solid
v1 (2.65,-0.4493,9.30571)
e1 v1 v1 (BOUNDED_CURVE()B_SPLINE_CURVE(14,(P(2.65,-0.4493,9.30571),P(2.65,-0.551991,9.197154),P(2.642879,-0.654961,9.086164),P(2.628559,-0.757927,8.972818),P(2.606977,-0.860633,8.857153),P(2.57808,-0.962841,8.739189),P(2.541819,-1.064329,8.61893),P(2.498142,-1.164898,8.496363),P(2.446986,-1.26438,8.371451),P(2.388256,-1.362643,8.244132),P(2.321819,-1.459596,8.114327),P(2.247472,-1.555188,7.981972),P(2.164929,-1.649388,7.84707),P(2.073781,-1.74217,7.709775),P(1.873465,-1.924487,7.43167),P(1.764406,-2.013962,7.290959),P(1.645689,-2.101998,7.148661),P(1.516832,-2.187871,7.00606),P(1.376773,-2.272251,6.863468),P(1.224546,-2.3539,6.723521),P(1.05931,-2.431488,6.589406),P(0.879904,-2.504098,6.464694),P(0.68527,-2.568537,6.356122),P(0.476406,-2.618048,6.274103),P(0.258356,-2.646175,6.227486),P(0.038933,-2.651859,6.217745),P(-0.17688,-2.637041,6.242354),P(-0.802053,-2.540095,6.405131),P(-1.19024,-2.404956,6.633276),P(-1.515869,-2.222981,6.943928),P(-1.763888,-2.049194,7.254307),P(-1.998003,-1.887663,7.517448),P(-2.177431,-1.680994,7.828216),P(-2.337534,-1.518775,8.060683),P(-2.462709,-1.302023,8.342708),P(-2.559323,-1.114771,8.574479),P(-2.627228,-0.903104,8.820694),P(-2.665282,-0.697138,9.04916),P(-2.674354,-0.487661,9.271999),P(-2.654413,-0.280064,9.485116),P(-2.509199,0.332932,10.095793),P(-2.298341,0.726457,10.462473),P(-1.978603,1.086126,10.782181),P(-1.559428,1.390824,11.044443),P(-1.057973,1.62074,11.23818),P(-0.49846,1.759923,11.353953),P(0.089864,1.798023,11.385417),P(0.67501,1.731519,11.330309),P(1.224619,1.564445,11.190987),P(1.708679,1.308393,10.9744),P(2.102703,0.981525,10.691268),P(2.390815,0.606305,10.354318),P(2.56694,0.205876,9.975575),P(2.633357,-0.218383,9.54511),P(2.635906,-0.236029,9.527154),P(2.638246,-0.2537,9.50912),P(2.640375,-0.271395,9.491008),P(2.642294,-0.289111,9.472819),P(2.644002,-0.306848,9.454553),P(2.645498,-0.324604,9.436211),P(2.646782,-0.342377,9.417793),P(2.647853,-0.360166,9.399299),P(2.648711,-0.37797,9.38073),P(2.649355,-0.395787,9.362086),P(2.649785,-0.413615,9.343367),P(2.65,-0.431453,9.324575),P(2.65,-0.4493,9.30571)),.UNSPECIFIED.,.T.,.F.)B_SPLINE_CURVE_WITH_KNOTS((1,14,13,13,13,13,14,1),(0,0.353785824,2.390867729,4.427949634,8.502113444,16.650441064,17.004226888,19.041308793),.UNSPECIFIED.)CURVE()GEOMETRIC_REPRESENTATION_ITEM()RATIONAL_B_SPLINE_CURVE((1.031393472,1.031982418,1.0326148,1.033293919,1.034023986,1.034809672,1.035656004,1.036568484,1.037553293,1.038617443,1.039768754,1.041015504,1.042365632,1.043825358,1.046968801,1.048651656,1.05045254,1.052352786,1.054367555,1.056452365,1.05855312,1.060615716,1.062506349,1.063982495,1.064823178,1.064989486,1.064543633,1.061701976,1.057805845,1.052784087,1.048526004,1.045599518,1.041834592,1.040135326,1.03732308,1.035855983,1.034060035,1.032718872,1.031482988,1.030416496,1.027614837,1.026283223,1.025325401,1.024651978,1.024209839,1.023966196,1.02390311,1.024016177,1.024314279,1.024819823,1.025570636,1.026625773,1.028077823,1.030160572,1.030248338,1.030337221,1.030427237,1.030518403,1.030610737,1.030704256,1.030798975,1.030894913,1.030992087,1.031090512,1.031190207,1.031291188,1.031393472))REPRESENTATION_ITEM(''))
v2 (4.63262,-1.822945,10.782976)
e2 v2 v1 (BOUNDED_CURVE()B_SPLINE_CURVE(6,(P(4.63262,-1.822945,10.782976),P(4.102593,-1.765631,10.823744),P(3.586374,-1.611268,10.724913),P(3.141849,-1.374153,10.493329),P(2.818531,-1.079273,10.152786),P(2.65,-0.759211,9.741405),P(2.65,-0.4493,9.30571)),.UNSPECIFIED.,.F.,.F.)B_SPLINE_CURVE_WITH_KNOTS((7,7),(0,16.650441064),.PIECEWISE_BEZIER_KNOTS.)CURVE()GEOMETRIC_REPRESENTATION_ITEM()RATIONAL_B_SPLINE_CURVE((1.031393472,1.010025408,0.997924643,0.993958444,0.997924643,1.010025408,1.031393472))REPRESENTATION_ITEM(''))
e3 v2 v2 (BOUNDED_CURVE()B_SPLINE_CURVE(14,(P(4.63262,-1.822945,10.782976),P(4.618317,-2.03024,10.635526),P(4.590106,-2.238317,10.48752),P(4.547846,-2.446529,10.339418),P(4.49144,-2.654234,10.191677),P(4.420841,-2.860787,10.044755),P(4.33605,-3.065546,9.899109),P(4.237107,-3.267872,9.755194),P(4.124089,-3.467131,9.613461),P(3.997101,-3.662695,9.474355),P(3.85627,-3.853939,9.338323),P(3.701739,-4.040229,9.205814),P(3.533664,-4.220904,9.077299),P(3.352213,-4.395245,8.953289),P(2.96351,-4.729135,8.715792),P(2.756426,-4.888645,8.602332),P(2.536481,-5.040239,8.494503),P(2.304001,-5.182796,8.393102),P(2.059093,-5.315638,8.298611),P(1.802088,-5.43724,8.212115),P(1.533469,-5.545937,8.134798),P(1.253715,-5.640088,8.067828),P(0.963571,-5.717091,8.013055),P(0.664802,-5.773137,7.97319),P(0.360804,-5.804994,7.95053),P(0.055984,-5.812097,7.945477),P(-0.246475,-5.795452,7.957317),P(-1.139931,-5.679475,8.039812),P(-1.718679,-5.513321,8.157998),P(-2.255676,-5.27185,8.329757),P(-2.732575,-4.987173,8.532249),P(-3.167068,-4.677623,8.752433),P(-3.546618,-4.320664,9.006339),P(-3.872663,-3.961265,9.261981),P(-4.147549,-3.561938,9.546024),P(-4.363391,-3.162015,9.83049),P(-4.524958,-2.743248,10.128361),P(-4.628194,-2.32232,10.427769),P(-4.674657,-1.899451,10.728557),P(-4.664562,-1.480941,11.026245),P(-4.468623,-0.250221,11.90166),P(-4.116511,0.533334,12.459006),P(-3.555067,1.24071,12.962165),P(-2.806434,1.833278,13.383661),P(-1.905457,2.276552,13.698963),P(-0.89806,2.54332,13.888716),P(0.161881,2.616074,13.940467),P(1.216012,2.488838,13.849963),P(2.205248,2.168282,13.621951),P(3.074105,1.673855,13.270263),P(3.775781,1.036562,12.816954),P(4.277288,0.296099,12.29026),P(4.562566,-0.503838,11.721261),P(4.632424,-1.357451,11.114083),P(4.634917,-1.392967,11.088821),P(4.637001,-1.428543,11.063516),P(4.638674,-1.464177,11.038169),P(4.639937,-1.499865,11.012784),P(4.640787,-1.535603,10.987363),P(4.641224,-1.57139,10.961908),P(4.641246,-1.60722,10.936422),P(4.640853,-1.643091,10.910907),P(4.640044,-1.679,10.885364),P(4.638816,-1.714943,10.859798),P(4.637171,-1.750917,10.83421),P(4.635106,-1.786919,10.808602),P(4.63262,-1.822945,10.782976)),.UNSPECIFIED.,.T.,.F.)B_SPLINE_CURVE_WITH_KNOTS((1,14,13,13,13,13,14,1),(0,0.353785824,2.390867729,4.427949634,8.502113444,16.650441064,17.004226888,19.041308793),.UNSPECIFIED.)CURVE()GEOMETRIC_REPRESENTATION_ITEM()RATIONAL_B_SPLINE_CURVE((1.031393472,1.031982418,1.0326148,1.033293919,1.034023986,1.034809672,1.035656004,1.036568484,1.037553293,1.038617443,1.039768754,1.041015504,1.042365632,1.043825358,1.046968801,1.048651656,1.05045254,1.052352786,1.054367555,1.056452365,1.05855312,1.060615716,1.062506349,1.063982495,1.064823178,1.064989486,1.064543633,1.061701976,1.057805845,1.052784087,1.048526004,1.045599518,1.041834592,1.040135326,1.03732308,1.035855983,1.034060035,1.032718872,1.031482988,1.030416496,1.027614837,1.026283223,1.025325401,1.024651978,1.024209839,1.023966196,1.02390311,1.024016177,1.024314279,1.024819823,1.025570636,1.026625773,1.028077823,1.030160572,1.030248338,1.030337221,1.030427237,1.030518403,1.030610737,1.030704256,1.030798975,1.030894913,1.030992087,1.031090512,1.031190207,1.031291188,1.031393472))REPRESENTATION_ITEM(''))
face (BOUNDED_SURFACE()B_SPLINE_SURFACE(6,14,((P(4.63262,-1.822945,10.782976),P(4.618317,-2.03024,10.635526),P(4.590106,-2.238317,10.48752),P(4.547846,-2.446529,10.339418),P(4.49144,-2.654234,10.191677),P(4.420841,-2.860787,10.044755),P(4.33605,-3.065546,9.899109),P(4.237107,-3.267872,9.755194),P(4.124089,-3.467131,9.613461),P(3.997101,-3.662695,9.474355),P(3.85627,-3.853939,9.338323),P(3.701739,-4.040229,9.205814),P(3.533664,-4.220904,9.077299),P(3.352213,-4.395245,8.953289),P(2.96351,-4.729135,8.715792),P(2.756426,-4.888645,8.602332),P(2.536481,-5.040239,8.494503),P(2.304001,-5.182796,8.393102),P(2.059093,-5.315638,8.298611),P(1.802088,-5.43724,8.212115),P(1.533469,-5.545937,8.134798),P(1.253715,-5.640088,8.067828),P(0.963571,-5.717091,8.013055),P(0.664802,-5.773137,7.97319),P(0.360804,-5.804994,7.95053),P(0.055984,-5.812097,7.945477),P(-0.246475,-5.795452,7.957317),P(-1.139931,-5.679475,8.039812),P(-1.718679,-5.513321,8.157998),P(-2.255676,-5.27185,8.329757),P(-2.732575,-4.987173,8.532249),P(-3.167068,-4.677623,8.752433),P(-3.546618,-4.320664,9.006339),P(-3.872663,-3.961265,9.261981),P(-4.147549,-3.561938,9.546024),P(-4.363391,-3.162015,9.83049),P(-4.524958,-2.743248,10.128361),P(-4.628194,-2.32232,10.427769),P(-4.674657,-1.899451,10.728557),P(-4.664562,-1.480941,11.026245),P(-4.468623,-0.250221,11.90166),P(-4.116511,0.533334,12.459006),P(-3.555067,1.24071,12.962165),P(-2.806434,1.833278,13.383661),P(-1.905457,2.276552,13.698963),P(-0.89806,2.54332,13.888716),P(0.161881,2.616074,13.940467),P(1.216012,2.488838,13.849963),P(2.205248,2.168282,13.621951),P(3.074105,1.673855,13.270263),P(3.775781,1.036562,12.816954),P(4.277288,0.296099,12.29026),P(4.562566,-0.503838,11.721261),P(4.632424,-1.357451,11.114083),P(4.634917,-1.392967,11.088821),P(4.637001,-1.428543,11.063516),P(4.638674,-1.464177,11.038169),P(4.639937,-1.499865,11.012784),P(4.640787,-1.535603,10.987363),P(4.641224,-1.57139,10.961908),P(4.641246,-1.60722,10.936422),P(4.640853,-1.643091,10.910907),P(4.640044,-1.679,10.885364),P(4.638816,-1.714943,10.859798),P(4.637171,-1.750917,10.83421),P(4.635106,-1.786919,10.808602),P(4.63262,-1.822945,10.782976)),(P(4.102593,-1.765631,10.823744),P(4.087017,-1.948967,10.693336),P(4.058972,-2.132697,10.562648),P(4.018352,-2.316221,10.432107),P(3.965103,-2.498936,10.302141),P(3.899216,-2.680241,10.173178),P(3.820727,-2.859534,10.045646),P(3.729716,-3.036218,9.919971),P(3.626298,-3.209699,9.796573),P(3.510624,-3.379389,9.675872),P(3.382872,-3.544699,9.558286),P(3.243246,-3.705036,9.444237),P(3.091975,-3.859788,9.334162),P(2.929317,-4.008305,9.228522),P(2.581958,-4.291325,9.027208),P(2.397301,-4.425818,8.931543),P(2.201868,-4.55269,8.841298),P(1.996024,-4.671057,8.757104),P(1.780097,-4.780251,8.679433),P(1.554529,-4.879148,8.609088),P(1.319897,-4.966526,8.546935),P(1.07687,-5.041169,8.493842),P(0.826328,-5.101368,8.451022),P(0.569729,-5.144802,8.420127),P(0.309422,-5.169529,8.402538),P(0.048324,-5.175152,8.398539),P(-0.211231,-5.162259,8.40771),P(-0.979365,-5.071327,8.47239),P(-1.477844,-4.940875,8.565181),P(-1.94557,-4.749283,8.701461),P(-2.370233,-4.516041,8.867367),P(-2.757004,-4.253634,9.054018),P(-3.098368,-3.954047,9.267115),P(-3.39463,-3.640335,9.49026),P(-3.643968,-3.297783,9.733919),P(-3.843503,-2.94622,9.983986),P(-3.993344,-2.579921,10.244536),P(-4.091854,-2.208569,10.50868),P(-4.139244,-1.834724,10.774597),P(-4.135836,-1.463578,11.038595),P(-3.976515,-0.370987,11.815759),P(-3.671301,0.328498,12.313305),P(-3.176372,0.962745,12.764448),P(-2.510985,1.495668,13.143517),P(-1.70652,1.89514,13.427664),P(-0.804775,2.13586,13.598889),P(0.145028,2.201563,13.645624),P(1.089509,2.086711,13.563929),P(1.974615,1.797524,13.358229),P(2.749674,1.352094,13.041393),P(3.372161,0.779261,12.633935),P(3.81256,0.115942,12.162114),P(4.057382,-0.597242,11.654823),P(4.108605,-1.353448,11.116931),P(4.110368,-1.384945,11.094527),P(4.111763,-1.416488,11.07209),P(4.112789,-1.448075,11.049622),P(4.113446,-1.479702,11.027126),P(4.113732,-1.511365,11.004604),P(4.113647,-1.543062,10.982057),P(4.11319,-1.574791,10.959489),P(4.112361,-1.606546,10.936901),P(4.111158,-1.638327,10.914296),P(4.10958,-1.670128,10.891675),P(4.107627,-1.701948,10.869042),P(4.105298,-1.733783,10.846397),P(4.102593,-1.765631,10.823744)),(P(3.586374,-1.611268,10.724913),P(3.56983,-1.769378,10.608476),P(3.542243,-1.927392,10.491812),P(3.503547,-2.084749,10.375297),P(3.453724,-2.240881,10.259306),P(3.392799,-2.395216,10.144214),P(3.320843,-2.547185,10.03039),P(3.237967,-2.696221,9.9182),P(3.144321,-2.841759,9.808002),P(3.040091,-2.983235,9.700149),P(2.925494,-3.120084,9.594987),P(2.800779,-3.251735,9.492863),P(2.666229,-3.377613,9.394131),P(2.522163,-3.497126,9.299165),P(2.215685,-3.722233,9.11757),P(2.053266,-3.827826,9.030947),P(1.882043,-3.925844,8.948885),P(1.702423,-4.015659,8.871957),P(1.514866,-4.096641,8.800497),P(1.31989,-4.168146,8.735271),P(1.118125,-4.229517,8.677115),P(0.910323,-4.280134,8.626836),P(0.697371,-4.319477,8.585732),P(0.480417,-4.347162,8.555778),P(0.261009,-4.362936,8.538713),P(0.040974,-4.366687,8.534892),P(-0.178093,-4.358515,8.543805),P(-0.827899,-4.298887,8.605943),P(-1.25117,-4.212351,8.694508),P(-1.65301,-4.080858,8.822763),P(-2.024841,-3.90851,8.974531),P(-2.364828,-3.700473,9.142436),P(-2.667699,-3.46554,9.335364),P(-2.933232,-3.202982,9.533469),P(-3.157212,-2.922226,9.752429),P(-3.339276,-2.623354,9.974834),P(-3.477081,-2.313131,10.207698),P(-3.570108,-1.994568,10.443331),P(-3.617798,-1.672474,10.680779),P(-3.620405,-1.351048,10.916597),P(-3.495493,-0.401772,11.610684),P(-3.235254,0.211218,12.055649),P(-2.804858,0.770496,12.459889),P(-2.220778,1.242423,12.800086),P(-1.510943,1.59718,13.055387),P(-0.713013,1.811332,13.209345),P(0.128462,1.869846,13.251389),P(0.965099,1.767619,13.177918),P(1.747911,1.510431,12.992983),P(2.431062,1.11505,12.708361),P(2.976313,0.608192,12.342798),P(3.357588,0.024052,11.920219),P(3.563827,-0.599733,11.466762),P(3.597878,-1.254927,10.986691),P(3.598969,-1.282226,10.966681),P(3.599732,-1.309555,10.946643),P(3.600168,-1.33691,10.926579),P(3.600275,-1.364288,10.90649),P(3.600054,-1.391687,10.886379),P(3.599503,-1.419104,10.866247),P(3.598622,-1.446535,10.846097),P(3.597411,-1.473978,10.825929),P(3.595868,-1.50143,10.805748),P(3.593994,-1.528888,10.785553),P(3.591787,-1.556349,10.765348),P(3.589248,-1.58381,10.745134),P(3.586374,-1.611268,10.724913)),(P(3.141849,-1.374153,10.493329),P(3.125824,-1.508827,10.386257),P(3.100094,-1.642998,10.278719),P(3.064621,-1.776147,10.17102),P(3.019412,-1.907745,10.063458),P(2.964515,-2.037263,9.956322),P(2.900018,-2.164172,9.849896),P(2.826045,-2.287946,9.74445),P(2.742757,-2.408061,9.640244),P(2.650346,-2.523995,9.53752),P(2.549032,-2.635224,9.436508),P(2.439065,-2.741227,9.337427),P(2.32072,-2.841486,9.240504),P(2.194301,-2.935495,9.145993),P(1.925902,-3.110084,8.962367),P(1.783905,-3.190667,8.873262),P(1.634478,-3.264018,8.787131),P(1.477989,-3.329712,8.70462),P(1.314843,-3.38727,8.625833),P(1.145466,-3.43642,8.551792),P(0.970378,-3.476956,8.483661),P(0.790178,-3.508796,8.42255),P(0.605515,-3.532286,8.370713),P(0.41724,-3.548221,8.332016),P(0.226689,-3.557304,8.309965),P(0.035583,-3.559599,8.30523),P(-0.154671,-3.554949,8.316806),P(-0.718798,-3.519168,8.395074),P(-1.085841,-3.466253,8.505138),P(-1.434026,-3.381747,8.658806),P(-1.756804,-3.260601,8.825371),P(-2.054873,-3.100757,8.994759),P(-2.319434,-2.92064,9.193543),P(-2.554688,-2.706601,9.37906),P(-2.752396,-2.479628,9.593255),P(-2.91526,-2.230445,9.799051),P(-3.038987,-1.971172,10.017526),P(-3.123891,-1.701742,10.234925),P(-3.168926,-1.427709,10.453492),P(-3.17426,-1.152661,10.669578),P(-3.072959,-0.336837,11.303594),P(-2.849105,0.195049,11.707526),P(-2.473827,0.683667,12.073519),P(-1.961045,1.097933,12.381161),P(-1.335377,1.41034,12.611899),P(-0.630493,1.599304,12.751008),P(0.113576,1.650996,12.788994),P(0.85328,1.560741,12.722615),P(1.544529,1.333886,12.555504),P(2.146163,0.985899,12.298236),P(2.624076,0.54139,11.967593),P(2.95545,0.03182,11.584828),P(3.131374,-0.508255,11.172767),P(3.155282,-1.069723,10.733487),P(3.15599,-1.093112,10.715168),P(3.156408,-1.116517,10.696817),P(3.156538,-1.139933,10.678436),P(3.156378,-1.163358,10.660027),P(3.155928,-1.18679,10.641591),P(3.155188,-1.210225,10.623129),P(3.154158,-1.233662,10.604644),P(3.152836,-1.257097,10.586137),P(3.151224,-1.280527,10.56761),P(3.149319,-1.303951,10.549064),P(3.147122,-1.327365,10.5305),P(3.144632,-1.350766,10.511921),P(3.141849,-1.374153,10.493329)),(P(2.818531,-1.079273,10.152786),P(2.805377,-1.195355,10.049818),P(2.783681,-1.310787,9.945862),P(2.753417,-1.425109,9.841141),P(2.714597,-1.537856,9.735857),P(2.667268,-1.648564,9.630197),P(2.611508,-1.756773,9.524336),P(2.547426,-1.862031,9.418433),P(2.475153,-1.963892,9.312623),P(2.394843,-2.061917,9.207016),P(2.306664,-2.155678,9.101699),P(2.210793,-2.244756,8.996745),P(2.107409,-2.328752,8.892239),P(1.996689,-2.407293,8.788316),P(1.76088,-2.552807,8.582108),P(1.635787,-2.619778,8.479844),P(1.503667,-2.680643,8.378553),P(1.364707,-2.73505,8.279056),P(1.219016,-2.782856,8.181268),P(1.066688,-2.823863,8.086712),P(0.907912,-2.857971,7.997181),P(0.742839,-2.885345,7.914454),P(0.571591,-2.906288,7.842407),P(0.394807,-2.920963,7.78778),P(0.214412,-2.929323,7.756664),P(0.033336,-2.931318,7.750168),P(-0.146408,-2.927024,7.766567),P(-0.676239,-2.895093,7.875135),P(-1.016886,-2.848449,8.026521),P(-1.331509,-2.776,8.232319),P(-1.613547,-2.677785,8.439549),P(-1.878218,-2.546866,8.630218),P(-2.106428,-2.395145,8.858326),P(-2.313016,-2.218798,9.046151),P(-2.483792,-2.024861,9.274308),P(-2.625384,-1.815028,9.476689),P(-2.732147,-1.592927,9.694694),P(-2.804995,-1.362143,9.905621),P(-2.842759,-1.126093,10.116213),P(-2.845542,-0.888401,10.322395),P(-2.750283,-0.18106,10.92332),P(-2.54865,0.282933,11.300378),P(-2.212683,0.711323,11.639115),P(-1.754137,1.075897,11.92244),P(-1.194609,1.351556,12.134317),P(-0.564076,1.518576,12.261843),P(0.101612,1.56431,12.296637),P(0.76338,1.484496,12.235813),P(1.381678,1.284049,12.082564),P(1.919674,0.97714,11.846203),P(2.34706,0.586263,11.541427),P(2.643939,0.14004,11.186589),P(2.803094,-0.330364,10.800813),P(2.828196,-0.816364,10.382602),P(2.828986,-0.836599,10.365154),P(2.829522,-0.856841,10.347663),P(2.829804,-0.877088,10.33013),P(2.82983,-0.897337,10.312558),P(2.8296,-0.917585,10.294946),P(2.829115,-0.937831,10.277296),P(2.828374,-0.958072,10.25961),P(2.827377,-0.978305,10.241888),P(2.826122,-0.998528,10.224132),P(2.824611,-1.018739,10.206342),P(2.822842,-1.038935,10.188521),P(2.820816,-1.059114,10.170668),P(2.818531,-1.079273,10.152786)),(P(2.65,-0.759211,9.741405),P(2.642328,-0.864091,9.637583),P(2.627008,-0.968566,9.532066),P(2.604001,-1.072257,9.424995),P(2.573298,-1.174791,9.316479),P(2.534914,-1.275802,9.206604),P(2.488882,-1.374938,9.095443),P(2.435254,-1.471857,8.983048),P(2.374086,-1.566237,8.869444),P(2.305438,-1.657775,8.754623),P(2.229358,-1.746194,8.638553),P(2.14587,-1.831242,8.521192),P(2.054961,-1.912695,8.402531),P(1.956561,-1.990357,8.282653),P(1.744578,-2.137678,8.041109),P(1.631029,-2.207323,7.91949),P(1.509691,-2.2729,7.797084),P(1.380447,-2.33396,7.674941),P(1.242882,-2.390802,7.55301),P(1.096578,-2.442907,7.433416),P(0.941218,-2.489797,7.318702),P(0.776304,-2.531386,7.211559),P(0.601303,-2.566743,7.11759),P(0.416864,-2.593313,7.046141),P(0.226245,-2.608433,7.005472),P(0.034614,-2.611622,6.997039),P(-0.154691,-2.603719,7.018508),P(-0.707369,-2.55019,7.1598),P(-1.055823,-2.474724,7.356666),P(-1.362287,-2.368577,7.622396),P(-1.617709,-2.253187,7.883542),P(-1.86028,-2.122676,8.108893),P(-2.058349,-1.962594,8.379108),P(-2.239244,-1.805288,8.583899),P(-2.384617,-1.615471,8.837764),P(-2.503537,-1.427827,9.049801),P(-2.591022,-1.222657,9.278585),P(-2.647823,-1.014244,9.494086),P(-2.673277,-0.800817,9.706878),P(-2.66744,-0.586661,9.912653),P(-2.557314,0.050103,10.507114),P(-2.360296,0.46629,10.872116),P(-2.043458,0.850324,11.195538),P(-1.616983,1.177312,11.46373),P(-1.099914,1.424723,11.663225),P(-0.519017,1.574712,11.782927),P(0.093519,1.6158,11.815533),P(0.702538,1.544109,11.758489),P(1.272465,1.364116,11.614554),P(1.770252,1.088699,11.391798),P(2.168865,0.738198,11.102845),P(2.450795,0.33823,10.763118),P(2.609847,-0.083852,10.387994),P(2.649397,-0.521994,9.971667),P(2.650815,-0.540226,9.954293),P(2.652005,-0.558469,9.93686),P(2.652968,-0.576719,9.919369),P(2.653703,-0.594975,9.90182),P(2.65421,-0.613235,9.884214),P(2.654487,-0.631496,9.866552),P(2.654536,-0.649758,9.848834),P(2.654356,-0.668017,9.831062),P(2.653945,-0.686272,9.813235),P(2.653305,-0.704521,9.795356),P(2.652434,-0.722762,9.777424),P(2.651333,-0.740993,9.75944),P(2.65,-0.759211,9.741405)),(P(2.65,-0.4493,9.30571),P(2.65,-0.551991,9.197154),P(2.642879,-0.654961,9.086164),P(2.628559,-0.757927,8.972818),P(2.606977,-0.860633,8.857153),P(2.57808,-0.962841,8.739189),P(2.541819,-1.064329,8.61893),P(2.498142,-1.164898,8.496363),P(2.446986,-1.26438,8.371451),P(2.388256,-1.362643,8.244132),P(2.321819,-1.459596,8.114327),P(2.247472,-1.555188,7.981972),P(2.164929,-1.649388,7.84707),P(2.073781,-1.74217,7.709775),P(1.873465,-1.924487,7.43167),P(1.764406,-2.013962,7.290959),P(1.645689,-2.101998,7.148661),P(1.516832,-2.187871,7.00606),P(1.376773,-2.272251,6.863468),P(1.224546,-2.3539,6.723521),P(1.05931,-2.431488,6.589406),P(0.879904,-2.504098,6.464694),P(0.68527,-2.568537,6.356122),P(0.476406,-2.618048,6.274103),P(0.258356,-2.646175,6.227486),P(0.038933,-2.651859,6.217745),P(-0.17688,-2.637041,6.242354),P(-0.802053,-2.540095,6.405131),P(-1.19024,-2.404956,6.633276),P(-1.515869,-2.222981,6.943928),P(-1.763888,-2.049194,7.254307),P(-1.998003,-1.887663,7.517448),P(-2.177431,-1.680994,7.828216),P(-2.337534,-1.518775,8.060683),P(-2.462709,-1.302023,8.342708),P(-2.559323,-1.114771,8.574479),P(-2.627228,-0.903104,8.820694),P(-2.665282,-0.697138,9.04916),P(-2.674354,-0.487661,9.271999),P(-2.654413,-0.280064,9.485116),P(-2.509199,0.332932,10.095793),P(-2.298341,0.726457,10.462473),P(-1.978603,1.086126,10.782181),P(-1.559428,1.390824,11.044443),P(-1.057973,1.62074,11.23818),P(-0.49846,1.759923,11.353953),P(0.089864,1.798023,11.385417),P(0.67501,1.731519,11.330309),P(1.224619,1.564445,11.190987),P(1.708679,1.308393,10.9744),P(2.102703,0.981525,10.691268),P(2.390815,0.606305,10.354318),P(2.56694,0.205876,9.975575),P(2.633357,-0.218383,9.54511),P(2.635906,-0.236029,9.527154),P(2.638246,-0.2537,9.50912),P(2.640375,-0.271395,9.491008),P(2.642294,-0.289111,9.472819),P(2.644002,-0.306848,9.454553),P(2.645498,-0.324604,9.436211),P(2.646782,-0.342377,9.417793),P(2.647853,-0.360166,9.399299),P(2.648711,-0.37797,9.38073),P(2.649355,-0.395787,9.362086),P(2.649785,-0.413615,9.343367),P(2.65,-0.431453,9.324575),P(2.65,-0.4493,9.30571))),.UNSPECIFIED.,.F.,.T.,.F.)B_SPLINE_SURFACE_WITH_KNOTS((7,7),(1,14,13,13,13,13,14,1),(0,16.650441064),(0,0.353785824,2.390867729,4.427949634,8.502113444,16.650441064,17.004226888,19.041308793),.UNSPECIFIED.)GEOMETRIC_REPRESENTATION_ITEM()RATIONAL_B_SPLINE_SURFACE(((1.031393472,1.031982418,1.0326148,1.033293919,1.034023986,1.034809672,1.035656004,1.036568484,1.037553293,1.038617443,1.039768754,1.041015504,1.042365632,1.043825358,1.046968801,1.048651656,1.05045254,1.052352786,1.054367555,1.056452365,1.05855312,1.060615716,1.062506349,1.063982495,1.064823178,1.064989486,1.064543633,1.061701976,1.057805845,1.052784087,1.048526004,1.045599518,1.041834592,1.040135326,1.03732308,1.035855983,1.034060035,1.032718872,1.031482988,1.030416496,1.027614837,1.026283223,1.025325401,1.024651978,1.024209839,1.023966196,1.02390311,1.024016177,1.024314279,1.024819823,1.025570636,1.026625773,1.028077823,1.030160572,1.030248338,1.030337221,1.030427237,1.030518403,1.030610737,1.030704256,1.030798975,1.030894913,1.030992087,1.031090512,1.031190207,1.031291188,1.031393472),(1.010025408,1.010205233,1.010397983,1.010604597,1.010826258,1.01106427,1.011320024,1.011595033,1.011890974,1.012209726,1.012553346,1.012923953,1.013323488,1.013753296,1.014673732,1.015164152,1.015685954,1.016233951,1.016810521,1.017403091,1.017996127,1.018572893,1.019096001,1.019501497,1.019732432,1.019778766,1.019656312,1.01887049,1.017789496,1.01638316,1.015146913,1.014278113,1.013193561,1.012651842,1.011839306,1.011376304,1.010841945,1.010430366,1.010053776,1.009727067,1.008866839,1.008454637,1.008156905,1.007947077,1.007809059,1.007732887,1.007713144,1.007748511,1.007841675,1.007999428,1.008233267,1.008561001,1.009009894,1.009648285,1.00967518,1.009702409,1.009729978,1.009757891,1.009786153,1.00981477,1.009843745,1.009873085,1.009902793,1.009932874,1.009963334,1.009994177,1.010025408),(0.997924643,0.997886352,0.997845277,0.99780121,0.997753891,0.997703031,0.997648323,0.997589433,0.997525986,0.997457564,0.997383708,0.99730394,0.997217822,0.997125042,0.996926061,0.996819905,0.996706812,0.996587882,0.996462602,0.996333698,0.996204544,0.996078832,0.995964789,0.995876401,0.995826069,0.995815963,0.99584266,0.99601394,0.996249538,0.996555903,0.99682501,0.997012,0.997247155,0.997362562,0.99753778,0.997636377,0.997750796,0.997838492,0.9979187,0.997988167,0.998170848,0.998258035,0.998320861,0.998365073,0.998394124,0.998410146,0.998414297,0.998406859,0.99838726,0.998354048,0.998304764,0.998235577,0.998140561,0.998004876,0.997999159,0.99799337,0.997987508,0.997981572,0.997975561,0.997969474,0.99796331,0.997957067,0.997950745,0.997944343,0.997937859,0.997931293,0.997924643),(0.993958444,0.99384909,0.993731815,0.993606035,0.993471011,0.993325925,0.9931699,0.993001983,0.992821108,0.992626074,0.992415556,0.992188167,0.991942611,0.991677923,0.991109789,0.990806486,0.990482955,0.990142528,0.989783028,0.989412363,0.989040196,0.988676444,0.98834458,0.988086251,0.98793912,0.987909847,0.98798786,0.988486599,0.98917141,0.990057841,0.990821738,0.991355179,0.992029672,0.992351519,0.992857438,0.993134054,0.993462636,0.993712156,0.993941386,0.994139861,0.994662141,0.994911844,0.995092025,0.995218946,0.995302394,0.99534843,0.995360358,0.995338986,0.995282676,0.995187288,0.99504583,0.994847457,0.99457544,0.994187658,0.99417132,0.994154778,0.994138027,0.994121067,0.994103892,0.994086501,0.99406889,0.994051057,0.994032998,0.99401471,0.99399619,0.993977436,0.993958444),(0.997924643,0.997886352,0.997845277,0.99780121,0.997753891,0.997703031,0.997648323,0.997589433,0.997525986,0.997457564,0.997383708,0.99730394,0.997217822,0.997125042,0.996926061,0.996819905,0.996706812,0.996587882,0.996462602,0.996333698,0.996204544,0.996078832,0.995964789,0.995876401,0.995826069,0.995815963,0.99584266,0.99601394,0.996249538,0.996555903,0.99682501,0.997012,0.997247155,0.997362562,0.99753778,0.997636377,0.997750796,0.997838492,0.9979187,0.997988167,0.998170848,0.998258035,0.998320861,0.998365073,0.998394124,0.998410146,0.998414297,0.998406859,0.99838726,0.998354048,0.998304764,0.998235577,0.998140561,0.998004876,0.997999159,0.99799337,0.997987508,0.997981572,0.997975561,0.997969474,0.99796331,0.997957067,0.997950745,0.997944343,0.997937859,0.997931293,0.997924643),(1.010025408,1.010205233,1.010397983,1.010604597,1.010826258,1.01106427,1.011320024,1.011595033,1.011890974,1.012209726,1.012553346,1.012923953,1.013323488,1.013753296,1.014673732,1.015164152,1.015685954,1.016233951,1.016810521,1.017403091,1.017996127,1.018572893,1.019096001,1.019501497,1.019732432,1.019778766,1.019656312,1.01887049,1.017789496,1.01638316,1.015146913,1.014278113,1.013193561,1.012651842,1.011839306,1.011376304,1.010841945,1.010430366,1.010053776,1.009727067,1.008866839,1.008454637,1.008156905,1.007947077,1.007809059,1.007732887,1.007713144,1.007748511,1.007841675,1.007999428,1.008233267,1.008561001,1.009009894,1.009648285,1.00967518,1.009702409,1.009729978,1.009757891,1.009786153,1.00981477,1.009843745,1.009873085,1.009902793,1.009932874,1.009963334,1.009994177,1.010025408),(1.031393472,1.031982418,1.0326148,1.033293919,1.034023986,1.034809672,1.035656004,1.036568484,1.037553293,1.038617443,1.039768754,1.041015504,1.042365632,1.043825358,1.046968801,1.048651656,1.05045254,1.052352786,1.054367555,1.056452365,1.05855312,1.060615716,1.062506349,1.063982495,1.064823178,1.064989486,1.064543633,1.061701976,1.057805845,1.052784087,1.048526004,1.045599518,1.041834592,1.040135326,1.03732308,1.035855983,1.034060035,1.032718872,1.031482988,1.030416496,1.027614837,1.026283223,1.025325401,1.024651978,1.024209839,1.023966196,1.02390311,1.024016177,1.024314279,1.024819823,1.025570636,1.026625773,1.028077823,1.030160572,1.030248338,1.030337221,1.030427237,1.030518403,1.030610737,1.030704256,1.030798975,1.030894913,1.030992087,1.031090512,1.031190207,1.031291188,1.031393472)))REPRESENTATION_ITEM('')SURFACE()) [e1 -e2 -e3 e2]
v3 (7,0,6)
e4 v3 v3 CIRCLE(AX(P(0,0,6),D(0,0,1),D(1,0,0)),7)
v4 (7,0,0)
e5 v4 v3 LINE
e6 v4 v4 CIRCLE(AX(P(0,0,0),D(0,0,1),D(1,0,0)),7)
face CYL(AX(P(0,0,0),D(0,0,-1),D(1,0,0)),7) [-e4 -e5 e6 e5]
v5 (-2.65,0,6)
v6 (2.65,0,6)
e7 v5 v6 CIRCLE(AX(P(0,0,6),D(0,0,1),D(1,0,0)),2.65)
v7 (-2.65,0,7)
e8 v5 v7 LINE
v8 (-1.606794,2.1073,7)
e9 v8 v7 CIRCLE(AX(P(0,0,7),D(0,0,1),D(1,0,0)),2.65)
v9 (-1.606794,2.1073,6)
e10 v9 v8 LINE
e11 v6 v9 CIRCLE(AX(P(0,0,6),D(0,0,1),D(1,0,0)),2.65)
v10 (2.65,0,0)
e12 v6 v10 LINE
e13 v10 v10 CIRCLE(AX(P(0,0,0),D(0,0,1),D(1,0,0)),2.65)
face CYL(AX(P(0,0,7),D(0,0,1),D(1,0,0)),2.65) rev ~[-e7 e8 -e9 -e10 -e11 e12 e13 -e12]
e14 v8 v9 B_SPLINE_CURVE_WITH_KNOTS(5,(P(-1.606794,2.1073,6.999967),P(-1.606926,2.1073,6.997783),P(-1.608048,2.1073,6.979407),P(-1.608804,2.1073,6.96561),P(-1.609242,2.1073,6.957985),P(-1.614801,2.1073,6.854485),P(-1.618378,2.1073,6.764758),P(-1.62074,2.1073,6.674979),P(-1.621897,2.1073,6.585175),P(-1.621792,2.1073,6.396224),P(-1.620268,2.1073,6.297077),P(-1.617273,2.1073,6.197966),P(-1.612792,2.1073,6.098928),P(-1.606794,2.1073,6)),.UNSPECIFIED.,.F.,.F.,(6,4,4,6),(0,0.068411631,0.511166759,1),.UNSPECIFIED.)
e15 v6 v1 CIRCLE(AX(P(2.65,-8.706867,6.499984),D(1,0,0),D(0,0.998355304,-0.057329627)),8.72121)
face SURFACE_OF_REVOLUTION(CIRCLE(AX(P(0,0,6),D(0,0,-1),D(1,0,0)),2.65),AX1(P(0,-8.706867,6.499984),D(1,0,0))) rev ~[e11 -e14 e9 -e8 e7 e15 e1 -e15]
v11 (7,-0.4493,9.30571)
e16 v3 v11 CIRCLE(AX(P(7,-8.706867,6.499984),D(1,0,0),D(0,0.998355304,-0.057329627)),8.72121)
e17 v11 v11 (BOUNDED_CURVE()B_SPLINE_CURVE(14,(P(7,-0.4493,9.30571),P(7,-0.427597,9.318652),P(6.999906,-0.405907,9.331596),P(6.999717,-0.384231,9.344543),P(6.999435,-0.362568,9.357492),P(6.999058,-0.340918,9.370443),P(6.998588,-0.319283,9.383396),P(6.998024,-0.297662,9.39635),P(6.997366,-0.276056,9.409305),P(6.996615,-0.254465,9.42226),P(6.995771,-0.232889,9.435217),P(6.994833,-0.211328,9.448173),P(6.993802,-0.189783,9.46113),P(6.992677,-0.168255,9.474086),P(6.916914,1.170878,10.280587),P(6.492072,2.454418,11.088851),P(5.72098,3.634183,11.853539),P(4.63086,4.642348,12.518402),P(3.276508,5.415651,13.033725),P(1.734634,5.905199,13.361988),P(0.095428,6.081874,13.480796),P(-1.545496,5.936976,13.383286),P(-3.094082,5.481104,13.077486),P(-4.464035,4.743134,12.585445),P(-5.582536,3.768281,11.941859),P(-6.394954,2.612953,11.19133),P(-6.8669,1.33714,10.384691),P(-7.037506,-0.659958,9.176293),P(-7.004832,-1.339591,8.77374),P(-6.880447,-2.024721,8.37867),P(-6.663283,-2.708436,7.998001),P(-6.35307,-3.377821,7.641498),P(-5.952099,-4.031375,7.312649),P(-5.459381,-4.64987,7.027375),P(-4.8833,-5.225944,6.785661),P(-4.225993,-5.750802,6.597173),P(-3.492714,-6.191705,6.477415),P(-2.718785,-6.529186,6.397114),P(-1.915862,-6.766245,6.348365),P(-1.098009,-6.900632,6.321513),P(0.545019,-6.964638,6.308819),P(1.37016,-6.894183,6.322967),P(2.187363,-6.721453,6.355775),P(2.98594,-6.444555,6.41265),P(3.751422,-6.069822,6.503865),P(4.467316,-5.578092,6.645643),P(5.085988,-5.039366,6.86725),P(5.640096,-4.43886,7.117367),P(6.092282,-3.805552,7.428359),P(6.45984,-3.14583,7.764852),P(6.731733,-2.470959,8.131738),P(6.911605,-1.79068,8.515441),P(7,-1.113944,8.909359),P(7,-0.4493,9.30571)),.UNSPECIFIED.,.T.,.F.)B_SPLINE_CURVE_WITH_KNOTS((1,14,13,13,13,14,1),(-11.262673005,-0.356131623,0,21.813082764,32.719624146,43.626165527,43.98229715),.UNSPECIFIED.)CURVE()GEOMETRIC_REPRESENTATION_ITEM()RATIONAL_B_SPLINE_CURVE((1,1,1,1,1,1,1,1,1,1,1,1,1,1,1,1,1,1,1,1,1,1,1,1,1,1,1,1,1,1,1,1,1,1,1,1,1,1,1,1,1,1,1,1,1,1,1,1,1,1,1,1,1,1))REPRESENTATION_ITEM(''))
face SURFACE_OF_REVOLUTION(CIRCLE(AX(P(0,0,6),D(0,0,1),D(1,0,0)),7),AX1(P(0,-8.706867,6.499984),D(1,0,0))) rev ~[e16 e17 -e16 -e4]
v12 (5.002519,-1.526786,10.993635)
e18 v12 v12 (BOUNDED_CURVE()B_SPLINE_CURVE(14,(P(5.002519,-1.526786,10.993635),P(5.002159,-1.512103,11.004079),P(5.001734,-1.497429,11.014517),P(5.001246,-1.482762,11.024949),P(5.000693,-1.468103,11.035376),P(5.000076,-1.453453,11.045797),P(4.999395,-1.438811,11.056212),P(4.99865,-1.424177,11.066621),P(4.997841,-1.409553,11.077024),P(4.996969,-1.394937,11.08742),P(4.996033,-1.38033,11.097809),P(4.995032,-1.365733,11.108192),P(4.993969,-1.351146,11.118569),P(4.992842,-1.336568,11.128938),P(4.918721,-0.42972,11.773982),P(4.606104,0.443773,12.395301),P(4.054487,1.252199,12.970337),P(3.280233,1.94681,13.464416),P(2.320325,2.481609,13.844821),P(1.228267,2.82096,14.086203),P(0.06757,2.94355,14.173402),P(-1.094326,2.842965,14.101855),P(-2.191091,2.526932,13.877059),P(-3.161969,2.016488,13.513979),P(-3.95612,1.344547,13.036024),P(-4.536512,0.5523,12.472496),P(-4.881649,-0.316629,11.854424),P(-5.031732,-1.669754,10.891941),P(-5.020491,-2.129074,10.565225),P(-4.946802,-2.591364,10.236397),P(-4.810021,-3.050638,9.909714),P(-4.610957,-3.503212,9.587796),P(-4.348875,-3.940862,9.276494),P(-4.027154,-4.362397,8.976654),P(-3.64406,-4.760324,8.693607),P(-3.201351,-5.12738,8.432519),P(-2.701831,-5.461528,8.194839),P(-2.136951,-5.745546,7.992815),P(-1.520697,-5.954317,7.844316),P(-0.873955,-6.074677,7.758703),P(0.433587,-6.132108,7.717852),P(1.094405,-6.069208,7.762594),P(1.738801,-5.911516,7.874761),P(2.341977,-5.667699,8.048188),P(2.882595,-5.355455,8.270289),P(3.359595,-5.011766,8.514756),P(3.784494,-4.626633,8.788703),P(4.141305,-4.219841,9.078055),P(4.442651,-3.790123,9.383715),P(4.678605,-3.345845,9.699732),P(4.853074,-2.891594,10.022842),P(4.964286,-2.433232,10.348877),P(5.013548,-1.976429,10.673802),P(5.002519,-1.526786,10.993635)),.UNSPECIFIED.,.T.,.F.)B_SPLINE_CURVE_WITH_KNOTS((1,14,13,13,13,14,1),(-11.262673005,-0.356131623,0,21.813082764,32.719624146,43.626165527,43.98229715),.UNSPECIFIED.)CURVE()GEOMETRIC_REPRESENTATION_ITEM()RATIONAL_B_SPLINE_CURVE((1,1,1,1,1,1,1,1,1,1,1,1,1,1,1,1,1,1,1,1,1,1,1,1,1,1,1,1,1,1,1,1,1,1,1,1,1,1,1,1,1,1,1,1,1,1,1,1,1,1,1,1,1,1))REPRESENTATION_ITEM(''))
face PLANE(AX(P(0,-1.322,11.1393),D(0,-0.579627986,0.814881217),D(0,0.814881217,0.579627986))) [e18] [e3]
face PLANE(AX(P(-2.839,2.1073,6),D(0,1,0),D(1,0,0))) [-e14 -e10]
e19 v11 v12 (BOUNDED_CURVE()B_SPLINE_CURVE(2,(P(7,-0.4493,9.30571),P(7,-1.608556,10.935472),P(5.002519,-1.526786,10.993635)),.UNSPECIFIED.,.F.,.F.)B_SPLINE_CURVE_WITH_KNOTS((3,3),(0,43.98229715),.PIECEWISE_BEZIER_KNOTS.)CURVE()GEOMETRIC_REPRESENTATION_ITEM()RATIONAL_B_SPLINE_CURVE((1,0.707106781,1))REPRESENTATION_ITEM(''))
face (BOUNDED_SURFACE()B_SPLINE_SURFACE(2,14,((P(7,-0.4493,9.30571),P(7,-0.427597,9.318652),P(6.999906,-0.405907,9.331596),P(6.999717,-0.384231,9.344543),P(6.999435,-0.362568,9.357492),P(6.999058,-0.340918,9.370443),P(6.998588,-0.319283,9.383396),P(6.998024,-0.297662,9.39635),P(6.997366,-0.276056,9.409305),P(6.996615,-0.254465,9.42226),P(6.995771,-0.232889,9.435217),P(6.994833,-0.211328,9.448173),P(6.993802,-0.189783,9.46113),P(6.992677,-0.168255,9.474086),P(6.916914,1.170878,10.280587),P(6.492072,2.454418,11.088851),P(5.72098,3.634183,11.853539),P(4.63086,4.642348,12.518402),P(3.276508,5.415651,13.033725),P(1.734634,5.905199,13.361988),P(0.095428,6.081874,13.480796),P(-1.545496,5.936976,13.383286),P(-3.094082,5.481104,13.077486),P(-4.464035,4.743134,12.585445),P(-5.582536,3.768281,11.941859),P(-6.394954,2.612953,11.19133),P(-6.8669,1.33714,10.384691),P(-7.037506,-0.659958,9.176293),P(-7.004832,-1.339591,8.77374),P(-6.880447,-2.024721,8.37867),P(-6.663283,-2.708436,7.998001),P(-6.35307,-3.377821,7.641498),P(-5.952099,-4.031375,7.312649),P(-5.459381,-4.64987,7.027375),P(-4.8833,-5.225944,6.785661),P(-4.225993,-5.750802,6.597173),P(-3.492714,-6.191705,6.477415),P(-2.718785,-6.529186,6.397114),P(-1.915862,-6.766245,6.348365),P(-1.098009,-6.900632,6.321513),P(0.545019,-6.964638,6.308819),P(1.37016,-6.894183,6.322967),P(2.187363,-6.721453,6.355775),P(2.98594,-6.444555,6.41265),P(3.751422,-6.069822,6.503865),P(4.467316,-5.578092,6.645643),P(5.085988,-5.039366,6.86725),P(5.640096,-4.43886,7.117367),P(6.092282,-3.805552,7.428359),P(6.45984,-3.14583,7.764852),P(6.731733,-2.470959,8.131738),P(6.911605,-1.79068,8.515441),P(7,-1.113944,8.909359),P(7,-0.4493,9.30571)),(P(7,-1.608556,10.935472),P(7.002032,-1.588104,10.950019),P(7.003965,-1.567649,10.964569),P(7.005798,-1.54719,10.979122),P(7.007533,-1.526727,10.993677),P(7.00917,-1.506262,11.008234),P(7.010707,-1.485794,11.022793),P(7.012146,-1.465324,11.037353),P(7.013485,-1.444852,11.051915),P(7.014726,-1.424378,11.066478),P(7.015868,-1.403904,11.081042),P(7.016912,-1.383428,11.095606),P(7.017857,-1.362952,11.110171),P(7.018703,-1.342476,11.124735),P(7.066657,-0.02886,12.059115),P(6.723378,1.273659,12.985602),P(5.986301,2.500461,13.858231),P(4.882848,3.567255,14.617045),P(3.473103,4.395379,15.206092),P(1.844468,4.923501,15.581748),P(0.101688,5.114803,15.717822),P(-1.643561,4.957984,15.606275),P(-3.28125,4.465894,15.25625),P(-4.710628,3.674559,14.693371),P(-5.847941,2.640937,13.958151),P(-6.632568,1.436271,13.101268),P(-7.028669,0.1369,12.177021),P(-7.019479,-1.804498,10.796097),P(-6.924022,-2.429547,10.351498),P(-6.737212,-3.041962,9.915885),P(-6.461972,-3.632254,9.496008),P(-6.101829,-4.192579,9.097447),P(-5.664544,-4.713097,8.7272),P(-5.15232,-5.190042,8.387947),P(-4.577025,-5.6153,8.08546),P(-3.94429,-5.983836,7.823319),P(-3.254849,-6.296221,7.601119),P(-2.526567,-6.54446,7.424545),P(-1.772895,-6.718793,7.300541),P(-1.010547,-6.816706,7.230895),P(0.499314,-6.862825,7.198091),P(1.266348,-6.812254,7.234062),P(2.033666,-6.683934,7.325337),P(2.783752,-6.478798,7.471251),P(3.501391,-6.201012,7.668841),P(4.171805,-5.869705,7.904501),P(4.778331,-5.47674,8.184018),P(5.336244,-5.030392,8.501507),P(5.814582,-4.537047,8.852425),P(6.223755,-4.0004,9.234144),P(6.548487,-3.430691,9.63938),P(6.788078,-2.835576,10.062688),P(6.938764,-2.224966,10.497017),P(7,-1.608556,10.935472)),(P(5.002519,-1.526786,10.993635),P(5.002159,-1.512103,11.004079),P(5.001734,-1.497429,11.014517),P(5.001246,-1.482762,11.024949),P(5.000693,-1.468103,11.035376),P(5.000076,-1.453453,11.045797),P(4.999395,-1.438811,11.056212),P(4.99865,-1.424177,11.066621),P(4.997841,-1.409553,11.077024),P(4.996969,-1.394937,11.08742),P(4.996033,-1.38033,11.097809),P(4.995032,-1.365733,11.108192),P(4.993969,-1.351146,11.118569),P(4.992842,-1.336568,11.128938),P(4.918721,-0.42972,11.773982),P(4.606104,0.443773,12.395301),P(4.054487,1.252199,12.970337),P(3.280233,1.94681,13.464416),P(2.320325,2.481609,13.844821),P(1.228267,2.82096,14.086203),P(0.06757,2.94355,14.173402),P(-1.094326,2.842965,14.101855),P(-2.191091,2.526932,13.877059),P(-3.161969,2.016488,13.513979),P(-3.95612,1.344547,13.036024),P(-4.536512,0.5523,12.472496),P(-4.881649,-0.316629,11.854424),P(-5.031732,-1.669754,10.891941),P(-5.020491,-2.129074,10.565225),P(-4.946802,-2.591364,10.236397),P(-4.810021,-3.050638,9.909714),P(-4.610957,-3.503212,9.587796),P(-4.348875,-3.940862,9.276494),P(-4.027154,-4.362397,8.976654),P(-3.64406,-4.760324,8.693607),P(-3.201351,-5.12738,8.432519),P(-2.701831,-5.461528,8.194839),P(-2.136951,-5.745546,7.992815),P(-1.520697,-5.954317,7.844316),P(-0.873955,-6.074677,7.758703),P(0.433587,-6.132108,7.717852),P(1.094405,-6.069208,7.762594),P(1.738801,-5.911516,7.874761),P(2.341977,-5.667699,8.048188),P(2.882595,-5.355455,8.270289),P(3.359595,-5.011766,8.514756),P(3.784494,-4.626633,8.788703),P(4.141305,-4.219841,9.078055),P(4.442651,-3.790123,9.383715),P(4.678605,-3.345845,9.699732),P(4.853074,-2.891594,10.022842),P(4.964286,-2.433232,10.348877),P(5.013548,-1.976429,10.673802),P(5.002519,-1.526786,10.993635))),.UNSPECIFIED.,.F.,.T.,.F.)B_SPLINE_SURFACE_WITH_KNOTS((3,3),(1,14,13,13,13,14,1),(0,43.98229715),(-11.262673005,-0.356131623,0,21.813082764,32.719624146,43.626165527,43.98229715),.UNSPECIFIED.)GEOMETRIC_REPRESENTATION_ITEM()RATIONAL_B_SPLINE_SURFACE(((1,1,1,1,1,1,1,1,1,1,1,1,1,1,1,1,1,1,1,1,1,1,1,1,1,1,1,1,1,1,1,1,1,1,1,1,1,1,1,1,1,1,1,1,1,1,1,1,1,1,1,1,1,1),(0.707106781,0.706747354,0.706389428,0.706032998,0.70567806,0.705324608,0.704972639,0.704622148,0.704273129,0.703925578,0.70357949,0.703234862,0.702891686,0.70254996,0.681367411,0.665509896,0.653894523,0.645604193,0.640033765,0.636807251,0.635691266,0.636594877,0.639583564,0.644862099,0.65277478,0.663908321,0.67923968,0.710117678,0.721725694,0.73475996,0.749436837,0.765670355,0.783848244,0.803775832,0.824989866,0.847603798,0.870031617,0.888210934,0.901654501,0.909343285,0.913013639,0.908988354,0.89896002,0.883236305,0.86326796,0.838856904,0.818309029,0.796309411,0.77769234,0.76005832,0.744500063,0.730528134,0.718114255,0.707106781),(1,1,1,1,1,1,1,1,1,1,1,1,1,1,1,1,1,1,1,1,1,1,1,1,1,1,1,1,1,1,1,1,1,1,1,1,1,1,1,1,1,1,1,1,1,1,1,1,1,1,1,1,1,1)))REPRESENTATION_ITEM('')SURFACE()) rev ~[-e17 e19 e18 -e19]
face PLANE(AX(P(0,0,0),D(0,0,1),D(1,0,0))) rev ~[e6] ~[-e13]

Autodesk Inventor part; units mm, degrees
ref_plane "YZ Plane" through (0, 0, 0) normal (1, 0, 0) x (0, 1, 0)
ref_plane "XZ Plane" through (0, 0, 0) normal (0, 1, 0) x (-1, 0, 0)
ref_plane "XY Plane" through (0, 0, 0) normal (0, 0, 1) x (1, 0, 0)
sketch "Sketch1" plane through (0, 0, 0) normal (0, 0, 1) x (1, 0, 0)
  arc A0 (-4.9984, 0.1266) -> (-4.98, 0.4466) centre (0, 0) ccw projected
  circle A1 centre (0, 0) radius 7.5 projected
  circle A2 centre (0, 0) radius 7 projected
  circle A3 centre (0, 0) radius 7
  point P0 (0, 0)
extrude "Extrusion1" add sketch "Sketch1" along normal blind 6 contours A2
sketch "Sketch2" plane through (0, 0, 6) normal (0, 0, 1) x (1, 0, 0)
  line L0 (0, 0) -> (-2.839, 0)
  line L1 (-2.839, 0) -> (-2.839, 2.1073)
  line L2 (-2.839, 2.1073) -> (0, 2.1073)
  line L3 (0, 2.1073) -> (0, 0)
extrude "Extrusion2" add sketch "Sketch2" along normal blind 1
sketch "Sketch3" plane through (0, 0, 6) normal (1, 0, 0) x (0, 0, -1)
  line L0 (0, 7) -> (0, -7) projected
  line L1 (0, 2.1073) -> (0, 0) projected
  line L2 (0, 0) -> (-1, 0) projected
  arc A0 (0, 0) -> (-5.1393, -1.322) centre (-0.5, -8.7067) ccw
  point P0 (6, 0)
  point P1 (-3.7243, -0.9054)
  point P2 (-4.3276, -1.2024)
sketch "Sketch4" plane through (0, 0, 6) normal (0, 0, 1) x (1, 0, 0)
  circle A0 centre (0, 0) radius 7
  circle A1 centre (0, 0) radius 2.65
  dimension "d20" = 5.3
sketch "Sketch8" plane through (0, 0, 7) normal (0, 0, 1) x (1, 0, 0)
  circle A0 centre (0, 0) radius 2.65
  dimension "d17" = 5.3
extrude "Extrusion3" cut sketch "Sketch8" against normal blind 100
sweep "Sweep6" add profiles "Sketch4" path "Sketch3" path curves A0
fillet "Fillet2" radius 2 2 edges at (-2.65, -1.322, 11.1393) (-7, -1.322, 11.1393)
properties part number "Eyes"
